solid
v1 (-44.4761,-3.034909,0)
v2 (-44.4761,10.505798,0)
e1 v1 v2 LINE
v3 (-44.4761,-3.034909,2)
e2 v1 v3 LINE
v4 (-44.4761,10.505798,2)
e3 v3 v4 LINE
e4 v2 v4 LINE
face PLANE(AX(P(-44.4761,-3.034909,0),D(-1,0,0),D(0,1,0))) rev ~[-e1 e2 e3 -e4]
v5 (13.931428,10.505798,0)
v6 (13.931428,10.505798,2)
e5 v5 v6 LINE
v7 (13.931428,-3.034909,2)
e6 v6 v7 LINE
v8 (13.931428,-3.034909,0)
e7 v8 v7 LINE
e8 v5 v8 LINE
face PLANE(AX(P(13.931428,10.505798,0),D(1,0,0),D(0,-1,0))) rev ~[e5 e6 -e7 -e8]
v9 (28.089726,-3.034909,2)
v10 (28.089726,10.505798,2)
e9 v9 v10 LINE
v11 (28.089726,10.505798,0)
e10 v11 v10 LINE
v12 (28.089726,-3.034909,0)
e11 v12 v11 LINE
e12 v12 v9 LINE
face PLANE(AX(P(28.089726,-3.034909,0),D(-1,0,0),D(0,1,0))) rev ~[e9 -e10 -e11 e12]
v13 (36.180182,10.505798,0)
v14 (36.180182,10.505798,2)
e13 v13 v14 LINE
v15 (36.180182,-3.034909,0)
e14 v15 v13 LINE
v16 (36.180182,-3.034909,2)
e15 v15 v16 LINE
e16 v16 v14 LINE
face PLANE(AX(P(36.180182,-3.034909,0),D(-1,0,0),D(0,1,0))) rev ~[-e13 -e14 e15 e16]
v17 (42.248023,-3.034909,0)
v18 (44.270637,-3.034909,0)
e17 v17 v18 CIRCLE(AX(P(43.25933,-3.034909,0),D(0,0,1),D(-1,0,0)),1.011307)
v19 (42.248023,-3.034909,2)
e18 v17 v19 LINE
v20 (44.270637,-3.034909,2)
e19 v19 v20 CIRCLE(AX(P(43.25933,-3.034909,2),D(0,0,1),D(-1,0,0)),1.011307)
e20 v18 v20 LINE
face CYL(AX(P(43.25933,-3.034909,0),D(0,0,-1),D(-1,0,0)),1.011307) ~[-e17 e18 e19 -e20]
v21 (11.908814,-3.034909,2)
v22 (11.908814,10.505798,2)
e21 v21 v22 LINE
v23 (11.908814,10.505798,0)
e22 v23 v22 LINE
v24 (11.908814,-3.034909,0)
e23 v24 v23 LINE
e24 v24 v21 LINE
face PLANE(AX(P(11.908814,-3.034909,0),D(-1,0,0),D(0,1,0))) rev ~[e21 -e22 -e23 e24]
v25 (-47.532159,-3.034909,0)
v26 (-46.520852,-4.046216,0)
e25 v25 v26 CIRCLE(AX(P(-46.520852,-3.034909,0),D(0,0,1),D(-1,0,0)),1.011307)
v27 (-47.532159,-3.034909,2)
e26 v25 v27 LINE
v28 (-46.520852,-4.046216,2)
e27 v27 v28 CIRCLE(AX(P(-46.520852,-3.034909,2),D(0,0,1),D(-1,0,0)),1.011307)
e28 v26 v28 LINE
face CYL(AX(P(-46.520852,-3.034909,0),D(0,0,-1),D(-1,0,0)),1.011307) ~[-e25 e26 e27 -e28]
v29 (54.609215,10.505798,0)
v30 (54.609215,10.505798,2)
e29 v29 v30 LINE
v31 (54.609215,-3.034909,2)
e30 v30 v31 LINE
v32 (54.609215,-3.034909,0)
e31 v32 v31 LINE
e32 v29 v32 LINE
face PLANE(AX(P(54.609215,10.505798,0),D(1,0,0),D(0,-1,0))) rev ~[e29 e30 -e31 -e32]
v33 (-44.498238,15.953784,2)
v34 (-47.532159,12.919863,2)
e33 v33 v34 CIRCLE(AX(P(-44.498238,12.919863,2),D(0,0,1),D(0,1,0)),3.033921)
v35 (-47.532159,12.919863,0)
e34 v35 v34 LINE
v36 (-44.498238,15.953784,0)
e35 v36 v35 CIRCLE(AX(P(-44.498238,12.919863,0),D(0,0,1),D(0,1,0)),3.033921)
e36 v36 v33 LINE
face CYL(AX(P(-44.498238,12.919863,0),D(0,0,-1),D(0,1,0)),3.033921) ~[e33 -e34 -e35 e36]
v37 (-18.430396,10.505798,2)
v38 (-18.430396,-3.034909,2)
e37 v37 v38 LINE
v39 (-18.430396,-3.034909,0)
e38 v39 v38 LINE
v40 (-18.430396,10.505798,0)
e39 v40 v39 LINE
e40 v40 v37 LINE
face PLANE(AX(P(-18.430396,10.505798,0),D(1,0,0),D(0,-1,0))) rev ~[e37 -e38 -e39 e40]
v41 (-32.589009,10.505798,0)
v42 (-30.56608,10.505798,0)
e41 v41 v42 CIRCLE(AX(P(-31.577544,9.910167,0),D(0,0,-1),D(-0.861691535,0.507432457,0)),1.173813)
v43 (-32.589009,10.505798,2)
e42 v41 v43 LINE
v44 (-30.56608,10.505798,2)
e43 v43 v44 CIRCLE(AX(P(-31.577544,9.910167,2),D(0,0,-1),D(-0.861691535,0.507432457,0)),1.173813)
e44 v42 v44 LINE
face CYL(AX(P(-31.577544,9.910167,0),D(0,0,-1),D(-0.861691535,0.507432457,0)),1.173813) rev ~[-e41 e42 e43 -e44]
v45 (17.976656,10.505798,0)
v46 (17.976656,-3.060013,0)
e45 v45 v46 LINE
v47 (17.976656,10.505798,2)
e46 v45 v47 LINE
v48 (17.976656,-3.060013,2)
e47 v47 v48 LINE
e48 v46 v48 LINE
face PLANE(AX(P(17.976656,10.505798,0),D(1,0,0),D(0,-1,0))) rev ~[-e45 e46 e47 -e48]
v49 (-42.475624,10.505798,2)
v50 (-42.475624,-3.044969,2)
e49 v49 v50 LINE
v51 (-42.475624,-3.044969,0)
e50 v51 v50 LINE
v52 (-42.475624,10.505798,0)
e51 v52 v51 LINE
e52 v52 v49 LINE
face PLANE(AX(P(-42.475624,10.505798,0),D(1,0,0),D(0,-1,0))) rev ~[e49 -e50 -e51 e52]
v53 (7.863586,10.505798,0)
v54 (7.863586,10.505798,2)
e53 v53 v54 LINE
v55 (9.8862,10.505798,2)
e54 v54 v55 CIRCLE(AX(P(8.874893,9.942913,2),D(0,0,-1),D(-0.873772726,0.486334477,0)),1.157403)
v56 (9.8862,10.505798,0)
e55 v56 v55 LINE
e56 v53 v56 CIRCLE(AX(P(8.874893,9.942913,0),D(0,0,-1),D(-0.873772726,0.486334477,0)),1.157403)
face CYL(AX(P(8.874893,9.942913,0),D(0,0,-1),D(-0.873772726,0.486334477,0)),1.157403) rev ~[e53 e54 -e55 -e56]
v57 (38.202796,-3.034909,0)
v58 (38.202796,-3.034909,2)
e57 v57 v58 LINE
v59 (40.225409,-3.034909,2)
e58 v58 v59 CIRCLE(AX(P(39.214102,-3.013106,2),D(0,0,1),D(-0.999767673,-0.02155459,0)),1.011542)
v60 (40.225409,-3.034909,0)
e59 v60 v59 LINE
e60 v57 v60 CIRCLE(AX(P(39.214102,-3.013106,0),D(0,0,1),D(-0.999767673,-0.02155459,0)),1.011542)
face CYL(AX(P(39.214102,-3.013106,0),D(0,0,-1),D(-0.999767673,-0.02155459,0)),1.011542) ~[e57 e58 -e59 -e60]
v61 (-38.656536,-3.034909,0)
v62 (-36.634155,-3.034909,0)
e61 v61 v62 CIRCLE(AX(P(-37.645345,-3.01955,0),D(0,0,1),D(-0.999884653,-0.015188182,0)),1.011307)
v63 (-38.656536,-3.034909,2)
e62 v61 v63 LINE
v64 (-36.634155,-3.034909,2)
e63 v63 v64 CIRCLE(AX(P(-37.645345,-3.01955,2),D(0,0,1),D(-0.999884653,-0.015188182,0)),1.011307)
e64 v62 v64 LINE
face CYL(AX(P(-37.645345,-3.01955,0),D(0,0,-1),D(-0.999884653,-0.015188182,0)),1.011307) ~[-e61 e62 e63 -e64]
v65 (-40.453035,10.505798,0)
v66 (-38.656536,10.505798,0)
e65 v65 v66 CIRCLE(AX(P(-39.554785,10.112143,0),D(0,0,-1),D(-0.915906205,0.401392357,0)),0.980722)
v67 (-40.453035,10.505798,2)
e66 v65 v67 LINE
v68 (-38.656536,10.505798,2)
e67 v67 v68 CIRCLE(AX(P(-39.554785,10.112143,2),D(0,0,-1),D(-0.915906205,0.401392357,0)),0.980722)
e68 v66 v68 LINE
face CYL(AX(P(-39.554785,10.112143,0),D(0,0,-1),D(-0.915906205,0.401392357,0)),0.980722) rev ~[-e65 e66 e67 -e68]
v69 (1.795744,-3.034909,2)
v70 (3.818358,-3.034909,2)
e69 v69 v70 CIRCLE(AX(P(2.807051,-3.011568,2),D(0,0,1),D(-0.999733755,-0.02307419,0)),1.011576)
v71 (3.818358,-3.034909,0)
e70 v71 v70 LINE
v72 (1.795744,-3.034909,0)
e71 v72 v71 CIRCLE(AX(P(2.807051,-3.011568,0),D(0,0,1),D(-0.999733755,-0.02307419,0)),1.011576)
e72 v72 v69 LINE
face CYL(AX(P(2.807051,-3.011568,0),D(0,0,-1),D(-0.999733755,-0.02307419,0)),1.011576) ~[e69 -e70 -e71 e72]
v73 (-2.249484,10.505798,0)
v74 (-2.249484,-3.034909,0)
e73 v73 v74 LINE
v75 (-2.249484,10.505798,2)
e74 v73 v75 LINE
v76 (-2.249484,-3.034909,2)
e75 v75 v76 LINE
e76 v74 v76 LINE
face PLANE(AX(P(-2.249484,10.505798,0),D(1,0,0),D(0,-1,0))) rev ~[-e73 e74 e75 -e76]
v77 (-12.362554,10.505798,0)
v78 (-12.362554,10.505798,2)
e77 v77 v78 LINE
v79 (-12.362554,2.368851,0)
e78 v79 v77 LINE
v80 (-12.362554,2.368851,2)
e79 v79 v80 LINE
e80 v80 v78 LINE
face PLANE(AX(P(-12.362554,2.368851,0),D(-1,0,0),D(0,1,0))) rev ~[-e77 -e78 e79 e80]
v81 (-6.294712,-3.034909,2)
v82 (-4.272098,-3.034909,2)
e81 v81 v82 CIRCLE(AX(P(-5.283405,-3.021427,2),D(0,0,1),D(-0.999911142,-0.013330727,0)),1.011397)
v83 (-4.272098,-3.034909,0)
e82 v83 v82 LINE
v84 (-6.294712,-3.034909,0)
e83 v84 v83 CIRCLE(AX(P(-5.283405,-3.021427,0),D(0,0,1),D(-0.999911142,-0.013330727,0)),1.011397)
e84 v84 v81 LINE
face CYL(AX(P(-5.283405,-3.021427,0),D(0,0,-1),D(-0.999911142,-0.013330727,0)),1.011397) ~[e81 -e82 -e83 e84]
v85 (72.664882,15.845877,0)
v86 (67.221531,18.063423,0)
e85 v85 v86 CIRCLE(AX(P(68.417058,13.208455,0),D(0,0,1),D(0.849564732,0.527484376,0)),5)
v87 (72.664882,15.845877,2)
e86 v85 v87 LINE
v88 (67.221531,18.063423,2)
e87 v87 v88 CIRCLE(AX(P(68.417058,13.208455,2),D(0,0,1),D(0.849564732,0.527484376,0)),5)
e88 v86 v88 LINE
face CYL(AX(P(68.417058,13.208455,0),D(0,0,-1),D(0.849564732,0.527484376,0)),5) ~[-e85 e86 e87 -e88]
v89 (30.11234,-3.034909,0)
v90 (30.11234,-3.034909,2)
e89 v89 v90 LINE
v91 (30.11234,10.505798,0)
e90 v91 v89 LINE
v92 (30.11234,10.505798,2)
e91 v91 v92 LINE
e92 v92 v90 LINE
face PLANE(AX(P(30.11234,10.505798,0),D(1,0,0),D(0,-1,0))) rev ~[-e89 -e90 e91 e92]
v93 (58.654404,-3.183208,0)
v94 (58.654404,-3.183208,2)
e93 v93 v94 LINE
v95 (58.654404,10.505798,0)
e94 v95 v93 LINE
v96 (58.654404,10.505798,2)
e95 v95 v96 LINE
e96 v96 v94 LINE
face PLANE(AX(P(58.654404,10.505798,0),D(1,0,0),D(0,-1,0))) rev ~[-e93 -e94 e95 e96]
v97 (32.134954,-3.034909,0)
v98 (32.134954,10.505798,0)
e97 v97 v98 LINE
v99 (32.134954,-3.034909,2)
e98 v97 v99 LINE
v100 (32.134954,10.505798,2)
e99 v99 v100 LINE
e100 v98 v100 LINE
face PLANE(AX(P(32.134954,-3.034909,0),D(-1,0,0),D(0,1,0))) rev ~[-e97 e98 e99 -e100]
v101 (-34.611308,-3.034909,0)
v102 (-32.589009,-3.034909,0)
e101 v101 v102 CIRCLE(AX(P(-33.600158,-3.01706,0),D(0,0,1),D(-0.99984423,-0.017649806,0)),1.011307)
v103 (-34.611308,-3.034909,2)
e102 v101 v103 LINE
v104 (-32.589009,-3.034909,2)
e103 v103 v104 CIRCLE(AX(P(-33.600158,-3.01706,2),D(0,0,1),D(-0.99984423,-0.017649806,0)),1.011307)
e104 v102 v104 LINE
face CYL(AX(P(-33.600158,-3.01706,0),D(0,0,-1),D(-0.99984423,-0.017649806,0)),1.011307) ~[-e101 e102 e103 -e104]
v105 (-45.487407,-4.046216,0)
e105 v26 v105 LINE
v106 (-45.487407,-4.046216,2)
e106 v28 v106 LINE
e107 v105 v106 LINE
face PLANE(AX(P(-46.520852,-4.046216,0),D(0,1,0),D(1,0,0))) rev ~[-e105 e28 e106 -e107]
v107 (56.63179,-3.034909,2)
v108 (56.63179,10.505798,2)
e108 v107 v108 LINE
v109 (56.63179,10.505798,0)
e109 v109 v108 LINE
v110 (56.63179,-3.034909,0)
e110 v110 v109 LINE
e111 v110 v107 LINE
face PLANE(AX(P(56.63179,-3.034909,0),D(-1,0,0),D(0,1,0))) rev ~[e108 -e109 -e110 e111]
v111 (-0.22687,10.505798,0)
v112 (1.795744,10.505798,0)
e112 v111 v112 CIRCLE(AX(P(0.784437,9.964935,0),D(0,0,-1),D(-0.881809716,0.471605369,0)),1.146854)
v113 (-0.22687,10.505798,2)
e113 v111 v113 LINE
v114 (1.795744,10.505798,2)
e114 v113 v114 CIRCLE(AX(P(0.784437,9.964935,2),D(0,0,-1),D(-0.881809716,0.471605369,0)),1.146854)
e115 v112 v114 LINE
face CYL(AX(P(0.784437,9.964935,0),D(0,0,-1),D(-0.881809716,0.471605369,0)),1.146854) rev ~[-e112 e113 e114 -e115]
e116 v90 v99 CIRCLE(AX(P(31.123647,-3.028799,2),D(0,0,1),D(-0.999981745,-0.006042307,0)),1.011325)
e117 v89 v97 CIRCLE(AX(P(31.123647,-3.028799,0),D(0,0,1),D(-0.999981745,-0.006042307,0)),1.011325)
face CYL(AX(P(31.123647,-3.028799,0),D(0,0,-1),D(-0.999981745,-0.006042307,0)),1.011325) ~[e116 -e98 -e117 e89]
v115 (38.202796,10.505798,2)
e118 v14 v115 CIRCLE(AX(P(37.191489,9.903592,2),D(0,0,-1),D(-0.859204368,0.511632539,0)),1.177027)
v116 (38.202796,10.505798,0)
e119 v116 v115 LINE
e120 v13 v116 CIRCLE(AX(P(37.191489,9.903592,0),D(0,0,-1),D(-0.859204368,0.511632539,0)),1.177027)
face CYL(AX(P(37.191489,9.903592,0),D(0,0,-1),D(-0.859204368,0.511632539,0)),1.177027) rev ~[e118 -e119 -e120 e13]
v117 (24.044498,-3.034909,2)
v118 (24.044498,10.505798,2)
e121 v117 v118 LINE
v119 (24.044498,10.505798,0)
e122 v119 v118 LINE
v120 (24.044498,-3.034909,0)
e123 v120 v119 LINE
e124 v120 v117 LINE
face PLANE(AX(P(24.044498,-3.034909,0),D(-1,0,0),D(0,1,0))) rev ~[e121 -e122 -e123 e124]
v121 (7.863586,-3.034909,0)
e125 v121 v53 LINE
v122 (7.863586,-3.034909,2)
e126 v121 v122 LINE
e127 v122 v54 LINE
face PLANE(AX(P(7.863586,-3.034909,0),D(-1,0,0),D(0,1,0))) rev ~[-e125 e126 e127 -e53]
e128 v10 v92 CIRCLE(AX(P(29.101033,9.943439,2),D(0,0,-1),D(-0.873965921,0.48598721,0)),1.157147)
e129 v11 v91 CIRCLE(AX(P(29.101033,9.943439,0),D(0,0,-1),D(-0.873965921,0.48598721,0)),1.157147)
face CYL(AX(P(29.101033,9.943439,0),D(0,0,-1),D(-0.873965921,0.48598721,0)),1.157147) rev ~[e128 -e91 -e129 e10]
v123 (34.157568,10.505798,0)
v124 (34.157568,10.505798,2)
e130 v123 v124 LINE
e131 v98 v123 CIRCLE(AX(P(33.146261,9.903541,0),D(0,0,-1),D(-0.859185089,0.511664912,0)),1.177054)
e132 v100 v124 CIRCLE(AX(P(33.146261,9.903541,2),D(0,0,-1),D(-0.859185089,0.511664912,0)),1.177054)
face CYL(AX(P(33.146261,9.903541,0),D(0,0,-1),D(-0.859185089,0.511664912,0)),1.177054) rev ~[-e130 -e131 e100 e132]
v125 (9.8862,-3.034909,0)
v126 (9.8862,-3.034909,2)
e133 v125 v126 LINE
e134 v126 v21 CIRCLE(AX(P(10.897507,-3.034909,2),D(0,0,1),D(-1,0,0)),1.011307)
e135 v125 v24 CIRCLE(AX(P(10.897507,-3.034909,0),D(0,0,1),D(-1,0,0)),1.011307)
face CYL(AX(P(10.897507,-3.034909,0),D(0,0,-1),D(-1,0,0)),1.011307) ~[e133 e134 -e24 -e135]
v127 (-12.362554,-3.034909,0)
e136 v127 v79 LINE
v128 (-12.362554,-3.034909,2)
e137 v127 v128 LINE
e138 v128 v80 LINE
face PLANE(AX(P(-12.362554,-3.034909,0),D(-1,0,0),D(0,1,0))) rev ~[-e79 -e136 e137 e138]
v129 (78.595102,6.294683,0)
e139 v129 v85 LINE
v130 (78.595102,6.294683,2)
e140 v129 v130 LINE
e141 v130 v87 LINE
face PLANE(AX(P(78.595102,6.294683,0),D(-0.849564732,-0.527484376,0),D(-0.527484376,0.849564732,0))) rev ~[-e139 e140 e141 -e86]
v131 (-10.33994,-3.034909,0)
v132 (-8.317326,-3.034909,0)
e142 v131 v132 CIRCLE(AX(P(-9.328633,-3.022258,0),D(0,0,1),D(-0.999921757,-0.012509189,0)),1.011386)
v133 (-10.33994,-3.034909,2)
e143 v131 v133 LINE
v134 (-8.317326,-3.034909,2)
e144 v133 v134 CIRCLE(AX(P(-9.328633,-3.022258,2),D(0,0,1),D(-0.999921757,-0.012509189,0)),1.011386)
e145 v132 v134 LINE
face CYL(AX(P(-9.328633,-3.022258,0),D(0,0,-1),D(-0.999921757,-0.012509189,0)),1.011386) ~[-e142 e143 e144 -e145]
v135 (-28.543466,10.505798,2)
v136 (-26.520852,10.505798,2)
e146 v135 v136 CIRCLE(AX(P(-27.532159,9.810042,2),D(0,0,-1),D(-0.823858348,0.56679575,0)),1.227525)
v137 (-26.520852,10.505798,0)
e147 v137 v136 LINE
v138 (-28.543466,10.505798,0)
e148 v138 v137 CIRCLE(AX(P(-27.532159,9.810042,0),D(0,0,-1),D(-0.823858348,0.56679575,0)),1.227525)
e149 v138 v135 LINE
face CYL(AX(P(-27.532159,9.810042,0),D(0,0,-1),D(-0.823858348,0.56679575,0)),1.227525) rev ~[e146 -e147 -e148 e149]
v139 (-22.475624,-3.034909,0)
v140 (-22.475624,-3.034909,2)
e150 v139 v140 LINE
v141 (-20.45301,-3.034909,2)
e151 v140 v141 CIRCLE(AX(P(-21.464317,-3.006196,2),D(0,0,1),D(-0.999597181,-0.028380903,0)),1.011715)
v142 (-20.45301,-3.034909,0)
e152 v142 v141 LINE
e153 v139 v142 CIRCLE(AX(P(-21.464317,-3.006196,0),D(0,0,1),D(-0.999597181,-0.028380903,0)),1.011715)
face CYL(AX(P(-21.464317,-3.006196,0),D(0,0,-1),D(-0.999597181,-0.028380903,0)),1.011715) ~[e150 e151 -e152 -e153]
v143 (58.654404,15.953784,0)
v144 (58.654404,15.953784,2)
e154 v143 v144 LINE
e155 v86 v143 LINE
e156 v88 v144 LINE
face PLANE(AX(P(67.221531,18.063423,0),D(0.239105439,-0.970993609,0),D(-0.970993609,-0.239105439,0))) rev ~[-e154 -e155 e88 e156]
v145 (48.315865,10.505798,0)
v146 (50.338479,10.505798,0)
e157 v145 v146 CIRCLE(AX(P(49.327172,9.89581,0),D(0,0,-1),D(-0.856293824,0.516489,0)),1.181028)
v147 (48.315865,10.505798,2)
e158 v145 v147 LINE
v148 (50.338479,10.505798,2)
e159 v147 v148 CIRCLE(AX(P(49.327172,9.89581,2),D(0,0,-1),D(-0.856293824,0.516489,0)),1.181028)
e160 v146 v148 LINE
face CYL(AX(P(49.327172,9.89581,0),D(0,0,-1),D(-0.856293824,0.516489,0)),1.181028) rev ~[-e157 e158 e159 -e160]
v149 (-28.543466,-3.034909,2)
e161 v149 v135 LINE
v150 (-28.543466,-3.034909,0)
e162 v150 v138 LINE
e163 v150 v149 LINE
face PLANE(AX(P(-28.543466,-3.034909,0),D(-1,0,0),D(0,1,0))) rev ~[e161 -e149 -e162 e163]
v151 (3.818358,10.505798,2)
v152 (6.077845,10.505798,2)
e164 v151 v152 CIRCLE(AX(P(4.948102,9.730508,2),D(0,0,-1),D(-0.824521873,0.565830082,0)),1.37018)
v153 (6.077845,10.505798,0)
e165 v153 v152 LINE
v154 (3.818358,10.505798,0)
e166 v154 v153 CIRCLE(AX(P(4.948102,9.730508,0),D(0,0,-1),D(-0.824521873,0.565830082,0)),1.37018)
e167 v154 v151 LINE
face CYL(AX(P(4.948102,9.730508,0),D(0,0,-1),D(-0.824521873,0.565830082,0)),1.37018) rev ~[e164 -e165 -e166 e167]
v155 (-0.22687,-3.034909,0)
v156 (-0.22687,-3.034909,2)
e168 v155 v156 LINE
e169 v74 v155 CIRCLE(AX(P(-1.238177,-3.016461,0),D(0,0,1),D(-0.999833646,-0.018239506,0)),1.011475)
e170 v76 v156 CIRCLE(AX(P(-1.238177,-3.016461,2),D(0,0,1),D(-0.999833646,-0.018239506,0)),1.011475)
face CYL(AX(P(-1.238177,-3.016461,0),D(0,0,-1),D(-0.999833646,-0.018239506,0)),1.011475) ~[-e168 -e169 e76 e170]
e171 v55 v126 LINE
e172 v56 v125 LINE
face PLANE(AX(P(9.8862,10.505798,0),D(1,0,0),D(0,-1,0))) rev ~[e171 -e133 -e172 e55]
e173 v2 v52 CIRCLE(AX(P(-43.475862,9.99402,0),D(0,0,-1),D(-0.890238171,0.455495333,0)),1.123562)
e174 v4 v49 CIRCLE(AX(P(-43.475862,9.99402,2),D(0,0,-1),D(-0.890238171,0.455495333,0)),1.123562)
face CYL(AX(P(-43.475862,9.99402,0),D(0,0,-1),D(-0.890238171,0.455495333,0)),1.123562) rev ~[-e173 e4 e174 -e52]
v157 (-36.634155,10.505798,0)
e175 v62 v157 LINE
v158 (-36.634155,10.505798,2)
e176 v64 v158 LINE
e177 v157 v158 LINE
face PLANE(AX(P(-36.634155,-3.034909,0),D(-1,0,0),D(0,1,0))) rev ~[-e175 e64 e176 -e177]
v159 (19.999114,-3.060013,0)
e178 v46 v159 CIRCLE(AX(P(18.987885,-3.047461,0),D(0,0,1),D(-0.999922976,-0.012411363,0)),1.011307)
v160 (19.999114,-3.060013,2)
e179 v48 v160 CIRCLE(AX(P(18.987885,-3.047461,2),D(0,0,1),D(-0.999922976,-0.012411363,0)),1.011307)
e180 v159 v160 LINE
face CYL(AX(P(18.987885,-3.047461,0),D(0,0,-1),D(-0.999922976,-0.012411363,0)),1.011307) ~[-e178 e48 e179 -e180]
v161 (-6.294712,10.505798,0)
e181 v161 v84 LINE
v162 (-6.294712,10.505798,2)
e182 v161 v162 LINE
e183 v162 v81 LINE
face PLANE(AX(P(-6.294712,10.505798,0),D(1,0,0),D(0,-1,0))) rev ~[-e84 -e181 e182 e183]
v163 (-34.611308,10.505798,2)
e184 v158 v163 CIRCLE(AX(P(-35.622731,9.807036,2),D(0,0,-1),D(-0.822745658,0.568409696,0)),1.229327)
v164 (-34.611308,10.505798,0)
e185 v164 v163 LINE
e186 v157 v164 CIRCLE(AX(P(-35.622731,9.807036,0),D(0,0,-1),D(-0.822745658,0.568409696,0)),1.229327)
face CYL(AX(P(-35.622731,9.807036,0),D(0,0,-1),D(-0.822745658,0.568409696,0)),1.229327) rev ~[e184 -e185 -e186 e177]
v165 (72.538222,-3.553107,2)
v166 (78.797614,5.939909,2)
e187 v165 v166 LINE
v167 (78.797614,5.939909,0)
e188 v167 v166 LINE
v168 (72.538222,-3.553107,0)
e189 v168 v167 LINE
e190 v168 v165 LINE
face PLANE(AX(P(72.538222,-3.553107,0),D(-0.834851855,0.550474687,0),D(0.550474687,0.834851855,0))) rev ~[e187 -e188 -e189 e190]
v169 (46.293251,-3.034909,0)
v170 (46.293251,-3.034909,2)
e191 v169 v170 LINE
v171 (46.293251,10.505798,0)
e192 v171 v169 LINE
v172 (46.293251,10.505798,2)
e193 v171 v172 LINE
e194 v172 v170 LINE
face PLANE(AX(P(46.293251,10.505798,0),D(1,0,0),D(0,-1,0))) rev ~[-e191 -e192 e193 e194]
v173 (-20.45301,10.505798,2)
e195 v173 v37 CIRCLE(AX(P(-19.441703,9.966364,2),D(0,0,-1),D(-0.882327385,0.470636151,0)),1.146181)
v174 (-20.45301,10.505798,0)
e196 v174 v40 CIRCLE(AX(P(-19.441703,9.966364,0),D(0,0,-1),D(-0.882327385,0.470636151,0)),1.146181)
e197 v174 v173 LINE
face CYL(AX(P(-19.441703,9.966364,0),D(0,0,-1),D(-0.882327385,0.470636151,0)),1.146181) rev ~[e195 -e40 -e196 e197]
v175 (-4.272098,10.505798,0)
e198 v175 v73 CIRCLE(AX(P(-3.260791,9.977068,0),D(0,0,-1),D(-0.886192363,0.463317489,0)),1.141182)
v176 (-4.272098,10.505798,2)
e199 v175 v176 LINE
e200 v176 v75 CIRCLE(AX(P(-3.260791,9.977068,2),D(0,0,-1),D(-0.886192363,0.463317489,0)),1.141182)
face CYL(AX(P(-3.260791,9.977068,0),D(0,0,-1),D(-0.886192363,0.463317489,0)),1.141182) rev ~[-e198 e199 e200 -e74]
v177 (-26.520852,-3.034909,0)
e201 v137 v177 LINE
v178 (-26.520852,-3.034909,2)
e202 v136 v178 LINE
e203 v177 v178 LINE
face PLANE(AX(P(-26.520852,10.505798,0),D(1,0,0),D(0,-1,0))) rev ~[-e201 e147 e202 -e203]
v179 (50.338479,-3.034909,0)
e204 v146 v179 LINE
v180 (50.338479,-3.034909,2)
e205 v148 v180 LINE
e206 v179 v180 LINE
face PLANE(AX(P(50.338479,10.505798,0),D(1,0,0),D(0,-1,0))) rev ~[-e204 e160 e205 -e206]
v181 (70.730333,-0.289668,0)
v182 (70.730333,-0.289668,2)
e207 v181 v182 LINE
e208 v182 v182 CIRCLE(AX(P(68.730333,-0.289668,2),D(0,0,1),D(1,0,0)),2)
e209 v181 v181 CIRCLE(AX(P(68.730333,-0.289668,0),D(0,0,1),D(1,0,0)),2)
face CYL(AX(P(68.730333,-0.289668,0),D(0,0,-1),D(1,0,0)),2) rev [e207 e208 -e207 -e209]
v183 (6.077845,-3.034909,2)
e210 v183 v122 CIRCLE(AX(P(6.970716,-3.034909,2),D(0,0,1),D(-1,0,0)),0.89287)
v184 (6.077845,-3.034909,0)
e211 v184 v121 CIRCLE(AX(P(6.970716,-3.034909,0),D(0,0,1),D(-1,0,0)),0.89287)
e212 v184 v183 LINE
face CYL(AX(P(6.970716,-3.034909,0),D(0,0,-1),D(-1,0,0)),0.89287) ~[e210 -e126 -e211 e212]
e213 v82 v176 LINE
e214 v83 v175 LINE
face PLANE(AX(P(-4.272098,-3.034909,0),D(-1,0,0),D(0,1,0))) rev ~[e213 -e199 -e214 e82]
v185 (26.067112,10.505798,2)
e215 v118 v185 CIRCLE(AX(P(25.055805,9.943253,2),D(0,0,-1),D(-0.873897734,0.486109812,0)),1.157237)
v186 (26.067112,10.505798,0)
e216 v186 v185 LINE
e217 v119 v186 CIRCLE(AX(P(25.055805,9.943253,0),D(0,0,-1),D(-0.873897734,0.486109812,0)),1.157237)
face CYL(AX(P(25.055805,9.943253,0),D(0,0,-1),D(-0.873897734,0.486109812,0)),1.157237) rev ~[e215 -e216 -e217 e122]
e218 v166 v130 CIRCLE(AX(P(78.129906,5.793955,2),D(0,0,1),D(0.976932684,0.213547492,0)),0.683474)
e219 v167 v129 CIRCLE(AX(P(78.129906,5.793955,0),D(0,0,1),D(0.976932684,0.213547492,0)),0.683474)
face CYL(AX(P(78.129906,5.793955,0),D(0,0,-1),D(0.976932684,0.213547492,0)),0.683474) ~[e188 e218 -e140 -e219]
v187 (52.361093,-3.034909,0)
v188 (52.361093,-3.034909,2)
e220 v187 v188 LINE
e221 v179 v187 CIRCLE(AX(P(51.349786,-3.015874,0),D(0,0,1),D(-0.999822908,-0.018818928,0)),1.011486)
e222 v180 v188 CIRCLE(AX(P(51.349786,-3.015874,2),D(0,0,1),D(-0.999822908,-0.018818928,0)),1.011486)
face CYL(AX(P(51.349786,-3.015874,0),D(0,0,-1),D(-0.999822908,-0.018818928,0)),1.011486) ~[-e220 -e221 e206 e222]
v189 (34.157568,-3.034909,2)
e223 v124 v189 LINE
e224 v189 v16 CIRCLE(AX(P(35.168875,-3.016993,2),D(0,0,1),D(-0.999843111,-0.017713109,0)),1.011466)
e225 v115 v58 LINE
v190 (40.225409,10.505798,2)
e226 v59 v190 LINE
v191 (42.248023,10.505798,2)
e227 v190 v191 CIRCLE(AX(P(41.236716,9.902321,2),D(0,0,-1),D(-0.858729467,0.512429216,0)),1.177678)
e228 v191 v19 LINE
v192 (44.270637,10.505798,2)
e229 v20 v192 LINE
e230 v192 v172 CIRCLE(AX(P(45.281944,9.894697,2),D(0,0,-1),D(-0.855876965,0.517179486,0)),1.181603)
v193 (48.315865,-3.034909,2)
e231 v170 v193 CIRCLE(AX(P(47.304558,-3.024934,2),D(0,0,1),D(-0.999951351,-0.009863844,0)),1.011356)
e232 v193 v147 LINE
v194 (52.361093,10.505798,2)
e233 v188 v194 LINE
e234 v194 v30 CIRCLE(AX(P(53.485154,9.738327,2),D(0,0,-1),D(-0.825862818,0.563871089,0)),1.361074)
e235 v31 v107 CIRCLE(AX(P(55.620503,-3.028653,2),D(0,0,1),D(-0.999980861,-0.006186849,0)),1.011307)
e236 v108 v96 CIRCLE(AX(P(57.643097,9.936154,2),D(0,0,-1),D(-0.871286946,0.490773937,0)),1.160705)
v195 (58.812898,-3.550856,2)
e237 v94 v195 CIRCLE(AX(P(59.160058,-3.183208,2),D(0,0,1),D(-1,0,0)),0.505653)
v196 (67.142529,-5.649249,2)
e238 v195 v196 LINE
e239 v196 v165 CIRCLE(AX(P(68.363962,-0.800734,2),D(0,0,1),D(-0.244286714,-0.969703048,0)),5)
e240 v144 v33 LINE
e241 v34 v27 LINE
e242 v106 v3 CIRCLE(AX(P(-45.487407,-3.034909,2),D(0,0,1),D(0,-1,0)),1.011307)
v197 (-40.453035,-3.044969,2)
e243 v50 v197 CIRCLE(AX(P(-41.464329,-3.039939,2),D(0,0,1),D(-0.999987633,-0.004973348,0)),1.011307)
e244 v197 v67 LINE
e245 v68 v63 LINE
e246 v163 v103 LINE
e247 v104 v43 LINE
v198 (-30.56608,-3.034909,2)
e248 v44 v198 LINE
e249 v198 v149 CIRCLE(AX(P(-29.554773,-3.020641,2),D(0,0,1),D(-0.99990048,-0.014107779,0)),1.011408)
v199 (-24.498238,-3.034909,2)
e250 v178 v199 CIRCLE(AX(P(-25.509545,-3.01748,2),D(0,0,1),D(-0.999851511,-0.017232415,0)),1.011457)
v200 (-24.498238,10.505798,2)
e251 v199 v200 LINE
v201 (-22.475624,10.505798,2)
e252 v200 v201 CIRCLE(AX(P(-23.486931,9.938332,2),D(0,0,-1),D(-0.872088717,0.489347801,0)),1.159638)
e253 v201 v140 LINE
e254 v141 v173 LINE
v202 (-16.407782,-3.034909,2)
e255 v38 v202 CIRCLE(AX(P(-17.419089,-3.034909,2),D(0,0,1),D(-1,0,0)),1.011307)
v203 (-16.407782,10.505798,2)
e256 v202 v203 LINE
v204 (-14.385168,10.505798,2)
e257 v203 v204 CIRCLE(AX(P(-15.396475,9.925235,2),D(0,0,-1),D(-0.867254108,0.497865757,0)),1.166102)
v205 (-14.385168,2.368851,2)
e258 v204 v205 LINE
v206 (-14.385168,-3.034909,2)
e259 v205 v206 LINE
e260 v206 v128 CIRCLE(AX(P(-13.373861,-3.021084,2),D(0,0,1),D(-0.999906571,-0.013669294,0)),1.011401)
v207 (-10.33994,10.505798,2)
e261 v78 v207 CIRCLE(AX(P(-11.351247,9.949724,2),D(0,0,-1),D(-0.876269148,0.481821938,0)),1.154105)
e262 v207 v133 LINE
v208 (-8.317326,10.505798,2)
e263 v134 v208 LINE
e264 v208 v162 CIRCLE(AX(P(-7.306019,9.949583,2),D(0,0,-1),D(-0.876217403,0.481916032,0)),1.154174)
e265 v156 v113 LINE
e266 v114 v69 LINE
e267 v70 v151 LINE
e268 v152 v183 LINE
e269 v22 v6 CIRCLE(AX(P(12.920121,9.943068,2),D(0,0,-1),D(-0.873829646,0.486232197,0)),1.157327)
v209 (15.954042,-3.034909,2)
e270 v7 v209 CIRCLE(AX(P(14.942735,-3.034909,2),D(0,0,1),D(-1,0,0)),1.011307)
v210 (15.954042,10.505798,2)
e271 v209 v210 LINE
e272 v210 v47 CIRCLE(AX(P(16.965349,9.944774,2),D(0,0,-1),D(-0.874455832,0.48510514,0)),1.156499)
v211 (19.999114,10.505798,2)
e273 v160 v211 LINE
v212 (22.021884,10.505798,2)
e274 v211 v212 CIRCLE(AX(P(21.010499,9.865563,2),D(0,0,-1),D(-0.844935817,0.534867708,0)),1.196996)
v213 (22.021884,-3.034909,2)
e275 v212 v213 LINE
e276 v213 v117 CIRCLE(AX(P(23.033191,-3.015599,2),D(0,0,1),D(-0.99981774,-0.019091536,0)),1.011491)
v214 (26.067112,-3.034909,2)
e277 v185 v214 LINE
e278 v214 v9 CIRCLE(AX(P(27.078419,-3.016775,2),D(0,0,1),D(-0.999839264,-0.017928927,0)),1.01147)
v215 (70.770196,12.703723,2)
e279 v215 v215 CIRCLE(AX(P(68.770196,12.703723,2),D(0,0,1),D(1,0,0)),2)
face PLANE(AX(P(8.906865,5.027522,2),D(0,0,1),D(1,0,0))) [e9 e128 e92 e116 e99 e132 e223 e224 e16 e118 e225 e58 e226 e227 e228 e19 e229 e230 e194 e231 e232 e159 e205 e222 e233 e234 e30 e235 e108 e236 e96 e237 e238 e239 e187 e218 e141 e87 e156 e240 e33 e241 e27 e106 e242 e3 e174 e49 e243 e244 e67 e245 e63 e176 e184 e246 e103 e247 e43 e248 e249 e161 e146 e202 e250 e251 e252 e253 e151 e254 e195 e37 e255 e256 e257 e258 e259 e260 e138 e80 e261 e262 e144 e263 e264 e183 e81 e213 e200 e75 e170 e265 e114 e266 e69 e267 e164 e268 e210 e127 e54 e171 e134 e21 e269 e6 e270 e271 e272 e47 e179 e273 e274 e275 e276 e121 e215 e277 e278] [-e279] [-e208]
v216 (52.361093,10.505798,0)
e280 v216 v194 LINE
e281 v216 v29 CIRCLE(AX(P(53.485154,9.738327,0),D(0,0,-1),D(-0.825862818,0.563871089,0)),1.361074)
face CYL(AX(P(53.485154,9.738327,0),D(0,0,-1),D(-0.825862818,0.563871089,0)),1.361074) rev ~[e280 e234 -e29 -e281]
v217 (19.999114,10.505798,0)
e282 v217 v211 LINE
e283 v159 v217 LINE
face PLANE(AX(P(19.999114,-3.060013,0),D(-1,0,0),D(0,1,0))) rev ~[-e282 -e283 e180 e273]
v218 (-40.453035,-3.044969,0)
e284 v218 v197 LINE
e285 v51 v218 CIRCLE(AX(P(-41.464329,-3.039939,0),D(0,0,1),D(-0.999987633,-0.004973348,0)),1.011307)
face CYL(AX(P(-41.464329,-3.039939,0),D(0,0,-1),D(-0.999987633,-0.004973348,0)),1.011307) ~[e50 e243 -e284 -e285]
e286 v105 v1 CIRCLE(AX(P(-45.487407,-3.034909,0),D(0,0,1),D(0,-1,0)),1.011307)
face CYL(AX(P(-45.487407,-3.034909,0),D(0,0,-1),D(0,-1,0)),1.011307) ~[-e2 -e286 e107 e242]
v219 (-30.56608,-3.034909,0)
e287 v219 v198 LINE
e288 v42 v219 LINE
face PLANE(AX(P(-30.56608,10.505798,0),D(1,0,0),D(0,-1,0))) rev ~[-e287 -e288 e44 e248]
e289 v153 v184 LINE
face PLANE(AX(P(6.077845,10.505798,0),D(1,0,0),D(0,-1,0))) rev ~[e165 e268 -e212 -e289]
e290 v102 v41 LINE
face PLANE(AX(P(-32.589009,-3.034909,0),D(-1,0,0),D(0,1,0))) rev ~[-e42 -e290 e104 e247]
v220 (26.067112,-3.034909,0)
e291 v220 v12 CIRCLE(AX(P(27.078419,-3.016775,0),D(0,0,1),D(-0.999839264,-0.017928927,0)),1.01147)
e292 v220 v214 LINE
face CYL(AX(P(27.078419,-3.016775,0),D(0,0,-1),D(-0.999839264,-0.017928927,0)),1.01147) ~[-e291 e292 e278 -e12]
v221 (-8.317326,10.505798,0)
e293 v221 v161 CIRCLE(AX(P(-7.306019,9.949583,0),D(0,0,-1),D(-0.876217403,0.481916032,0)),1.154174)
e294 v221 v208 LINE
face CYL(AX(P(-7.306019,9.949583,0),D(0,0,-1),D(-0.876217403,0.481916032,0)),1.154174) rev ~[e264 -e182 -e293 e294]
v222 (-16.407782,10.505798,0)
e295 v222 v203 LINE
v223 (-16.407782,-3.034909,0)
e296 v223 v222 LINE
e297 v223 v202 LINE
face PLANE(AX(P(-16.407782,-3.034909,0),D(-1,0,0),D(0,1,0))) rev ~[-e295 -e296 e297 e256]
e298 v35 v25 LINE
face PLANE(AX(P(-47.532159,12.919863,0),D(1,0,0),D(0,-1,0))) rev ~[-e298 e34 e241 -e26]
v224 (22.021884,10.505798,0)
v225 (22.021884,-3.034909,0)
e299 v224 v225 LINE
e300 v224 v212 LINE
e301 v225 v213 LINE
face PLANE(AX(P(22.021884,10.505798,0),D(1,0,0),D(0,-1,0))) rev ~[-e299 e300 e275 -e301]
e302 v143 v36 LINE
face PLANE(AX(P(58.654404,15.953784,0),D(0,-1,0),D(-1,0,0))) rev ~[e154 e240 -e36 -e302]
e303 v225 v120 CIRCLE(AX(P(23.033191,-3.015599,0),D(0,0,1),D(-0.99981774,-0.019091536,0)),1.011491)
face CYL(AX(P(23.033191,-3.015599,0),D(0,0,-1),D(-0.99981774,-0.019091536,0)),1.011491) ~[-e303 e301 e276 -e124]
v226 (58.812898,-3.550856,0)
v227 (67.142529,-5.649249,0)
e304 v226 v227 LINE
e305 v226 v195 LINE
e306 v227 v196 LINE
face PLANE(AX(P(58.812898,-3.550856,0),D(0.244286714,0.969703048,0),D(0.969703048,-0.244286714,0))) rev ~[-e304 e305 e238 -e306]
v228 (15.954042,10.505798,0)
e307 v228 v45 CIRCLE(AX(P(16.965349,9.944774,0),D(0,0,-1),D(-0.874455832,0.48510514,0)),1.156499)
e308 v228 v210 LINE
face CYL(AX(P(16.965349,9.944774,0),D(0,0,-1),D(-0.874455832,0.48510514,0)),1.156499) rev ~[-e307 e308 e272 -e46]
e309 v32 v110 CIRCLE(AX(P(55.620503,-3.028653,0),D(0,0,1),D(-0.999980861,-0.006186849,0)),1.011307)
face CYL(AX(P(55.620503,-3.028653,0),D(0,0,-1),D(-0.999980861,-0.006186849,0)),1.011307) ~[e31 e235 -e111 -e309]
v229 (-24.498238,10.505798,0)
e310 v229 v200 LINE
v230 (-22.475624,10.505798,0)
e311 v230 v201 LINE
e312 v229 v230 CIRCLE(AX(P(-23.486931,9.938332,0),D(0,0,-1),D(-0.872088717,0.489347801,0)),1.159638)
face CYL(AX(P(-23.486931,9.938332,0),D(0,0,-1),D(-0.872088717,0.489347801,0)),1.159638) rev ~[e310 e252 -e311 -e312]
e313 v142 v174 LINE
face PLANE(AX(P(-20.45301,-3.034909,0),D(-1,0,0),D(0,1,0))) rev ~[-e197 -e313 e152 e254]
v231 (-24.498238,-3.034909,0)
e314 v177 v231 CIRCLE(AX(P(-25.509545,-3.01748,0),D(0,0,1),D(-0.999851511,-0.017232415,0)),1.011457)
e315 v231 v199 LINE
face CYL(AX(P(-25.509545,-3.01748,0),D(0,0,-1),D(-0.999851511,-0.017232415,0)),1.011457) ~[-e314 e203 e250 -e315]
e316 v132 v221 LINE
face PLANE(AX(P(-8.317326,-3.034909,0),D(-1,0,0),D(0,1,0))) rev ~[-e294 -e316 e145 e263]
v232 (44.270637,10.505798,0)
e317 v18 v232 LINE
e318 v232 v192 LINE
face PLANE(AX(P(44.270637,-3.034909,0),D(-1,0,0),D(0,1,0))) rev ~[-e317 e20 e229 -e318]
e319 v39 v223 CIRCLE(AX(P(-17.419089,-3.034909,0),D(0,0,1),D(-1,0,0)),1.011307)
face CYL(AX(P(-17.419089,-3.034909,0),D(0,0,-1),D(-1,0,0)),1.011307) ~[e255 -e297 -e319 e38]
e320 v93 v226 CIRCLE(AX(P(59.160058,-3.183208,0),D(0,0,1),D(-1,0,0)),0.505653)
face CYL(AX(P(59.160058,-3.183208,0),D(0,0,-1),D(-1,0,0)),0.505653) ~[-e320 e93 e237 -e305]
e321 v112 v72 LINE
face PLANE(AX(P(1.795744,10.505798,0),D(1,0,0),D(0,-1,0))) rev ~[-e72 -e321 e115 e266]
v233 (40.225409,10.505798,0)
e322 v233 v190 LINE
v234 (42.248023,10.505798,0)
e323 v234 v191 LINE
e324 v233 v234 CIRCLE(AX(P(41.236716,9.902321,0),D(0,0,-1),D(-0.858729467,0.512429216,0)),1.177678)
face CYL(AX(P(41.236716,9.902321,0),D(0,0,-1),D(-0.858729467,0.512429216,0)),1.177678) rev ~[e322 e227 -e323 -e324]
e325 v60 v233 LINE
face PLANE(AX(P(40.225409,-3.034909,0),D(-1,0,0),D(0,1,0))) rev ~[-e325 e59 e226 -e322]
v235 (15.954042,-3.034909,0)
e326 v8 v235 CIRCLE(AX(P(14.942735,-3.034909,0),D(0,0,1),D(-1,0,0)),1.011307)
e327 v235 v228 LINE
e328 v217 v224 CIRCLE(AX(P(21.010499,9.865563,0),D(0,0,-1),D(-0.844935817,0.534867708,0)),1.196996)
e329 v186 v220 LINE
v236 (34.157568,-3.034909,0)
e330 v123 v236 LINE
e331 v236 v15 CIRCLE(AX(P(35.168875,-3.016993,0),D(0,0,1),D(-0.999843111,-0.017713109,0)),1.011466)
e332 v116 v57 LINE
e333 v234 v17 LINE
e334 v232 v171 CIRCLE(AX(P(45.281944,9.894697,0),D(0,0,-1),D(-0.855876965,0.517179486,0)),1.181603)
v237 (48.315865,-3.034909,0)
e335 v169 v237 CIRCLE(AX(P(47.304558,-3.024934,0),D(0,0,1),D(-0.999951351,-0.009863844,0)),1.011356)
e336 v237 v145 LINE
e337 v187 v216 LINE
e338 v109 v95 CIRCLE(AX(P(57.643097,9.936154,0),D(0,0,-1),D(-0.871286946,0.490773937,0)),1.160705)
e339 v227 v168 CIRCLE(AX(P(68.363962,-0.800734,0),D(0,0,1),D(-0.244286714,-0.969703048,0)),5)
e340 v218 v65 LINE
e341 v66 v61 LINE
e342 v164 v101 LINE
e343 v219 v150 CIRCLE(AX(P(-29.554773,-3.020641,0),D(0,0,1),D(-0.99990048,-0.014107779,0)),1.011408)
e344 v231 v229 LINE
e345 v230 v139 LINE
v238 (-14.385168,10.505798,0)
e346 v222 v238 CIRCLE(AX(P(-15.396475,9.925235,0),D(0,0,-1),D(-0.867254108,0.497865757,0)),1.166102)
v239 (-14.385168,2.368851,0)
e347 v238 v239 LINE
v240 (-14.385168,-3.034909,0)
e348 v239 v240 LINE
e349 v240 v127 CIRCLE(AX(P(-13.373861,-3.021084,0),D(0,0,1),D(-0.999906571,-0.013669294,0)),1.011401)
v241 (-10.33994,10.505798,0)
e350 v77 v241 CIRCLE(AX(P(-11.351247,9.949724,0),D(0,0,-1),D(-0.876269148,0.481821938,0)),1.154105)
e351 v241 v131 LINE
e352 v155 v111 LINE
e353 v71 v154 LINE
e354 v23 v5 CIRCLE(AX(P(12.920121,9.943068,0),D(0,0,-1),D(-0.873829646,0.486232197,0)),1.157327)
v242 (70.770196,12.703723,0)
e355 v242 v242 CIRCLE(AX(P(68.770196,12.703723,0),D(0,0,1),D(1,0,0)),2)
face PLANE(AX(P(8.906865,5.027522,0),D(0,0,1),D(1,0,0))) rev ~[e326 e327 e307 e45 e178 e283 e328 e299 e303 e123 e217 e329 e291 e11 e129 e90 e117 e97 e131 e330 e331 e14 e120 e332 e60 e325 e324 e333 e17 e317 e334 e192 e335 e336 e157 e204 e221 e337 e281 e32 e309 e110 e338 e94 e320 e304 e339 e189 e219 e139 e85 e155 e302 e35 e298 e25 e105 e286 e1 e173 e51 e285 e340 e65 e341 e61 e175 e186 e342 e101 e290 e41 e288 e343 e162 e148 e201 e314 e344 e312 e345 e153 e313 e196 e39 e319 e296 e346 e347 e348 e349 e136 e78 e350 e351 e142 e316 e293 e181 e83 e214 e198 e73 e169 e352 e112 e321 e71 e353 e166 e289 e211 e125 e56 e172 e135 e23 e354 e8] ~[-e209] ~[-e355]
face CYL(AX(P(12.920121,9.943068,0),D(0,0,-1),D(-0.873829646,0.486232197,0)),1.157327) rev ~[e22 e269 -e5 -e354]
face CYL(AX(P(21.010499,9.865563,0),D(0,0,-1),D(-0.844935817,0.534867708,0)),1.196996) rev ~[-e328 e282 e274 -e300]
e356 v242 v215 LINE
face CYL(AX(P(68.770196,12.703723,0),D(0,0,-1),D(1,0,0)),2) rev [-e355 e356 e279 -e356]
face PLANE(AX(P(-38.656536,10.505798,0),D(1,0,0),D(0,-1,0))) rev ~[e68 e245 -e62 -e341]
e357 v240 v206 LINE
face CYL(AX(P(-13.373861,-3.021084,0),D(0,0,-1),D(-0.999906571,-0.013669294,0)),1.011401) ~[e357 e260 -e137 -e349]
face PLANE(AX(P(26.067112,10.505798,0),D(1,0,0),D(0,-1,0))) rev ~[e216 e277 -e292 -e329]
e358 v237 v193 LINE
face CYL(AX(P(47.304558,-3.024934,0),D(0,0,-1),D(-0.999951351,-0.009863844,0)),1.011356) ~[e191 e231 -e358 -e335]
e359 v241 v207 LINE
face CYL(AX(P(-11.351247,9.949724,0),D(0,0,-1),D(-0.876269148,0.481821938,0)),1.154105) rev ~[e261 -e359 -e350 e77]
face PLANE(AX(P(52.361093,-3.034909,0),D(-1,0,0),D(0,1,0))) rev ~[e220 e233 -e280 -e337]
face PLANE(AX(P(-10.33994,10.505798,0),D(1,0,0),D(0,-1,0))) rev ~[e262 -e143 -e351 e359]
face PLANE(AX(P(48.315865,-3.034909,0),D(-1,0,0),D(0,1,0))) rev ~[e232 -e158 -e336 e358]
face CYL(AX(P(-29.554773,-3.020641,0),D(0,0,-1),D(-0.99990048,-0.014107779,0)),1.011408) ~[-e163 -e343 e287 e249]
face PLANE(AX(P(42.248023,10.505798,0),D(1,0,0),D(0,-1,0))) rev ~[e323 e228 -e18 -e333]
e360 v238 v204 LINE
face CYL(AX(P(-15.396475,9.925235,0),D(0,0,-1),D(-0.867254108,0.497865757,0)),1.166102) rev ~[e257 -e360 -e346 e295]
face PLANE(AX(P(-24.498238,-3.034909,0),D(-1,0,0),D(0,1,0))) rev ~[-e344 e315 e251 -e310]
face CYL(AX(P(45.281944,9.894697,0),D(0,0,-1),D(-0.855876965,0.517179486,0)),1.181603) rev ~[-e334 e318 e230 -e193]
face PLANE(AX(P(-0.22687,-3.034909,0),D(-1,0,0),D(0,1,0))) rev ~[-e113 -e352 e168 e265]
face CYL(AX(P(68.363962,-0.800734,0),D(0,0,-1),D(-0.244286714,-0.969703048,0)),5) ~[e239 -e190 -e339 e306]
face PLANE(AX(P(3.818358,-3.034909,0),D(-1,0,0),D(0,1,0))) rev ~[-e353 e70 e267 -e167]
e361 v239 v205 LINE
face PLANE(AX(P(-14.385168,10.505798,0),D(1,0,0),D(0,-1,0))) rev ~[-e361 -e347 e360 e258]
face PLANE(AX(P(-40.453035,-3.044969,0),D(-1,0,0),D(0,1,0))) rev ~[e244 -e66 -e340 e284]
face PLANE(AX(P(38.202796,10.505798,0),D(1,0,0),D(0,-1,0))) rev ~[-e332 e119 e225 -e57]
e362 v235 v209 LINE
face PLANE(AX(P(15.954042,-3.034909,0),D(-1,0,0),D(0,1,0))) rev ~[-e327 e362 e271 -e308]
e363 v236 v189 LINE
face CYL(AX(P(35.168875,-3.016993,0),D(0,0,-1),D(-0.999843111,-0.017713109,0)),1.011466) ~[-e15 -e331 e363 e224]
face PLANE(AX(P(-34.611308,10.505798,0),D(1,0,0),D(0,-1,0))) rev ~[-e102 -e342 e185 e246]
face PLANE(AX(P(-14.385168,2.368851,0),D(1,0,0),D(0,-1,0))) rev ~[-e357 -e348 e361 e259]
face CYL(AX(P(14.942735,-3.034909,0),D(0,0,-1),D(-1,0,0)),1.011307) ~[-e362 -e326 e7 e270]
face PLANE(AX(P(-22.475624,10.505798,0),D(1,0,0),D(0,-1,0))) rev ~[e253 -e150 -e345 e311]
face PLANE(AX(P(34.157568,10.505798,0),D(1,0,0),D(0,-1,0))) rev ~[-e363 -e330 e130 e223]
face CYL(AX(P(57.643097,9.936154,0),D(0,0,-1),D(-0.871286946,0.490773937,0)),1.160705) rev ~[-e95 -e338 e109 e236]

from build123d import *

# Parameters (mm, degrees)
F0_R     = 2
F1_DEPTH = 2


# Not quite as in the source:
# - a feature names something its author has since deleted; it is built from what else it names


with BuildPart() as f1:
    # F0 (on Top) → F1 (new body)
    with BuildSketch(Plane.XY):
        with BuildLine():
            ThreePointArc((-47.5321587284, -3.0349094544), (-47.2359537694, -3.7500114836), (-46.5208517402, -4.0462164426))
            Line((-46.5208517402, -4.0462164426), (-45.4874065769, -4.0462164426))
            ThreePointArc((-45.4874065769, -4.0462164426), (-44.7723045476, -3.7500114836), (-44.4760995886, -3.0349094544))
            Line((-44.4760995886, -3.0349094544), (-44.4760995886, 10.5057977874))
            ThreePointArc((-44.4760995886, 10.5057977874), (-43.4758616879, 11.1175826134), (-42.4756237872, 10.5057977874))
            Line((-42.4756237872, 10.5057977874), (-42.4756237872, -3.0349094544))
            Line((-42.4756237872, -3.0349094544), (-42.4756237872, -3.0449686175))
            ThreePointArc((-42.4756237872, -3.0449686175), (-41.464329306, -4.0512460242), (-40.4530348247, -3.0449686175))
            Line((-40.4530348247, -3.0449686175), (-40.4530348247, -3.0349094544))
            Line((-40.4530348247, -3.0349094544), (-40.4530348247, 2.3688513962))
            Line((-40.4530348247, 2.3688513962), (-40.4530348247, 10.5057977874))
            ThreePointArc((-40.4530348247, 10.5057977874), (-39.5547852119, 11.0928656343), (-38.6565355991, 10.5057977874))
            Line((-38.6565355991, 10.5057977874), (-38.6565355991, 2.3688513962))
            Line((-38.6565355991, 2.3688513962), (-38.6565355991, -3.0349094544))
            ThreePointArc((-38.6565355991, -3.0349094544), (-37.6453452622, -4.0308565278), (-36.6341549253, -3.0349094544))
            Line((-36.6341549253, -3.0349094544), (-36.6341549253, 2.3688513962))
            Line((-36.6341549253, 2.3688513962), (-36.6341549253, 10.5057977874))
            ThreePointArc((-36.6341549253, 10.5057977874), (-35.6227312857, 11.0363635), (-34.6113076461, 10.5057977874))
            Line((-34.6113076461, 10.5057977874), (-34.6113076461, 2.3688513962))
            Line((-34.6113076461, 2.3688513962), (-34.6113076461, -3.0349094544))
            ThreePointArc((-34.6113076461, -3.0349094544), (-33.6001581891, -4.0283670709), (-32.5890087321, -3.0349094544))
            Line((-32.5890087321, -3.0349094544), (-32.5890087321, 2.3688513962))
            Line((-32.5890087321, 2.3688513962), (-32.5890087321, 10.5057977874))
            ThreePointArc((-32.5890087321, 10.5057977874), (-31.5775442126, 11.0839798549), (-30.5660796932, 10.5057977874))
            Line((-30.5660796932, 10.5057977874), (-30.5660796932, 2.3688513962))
            Line((-30.5660796932, 2.3688513962), (-30.5660796932, -3.0349094544))
            ThreePointArc((-30.5660796932, -3.0349094544), (-29.5547727049, -4.0320483822), (-28.5434657167, -3.0349094544))
            Line((-28.5434657167, -3.0349094544), (-28.5434657167, 2.3688513962))
            Line((-28.5434657167, 2.3688513962), (-28.5434657167, 10.5057977874))
            ThreePointArc((-28.5434657167, 10.5057977874), (-27.5321587284, 11.0375669764), (-26.5208517402, 10.5057977874))
            Line((-26.5208517402, 10.5057977874), (-26.5208517402, 2.3688513962))
            Line((-26.5208517402, 2.3688513962), (-26.5208517402, -3.0349094544))
            ThreePointArc((-26.5208517402, -3.0349094544), (-25.5095447519, -4.0289367833), (-24.4982377637, -3.0349094544))
            Line((-24.4982377637, -3.0349094544), (-24.4982377637, 2.3688513962))
            Line((-24.4982377637, 2.3688513962), (-24.4982377637, 10.5057977874))
            ThreePointArc((-24.4982377637, 10.5057977874), (-23.4869307754, 11.0979693494), (-22.4756237872, 10.5057977874))
            Line((-22.4756237872, 10.5057977874), (-22.4756237872, 2.3688513962))
            Line((-22.4756237872, 2.3688513962), (-22.4756237872, -3.0349094544))
            ThreePointArc((-22.4756237872, -3.0349094544), (-21.464316799, -4.0179106089), (-20.4530098107, -3.0349094544))
            Line((-20.4530098107, -3.0349094544), (-20.4530098107, 2.3688513962))
            Line((-20.4530098107, 2.3688513962), (-20.4530098107, 10.5057977874))
            ThreePointArc((-20.4530098107, 10.5057977874), (-19.4417028225, 11.112544636), (-18.4303958342, 10.5057977874))
            Line((-18.4303958342, 10.5057977874), (-18.4303958342, 2.3688513962))
            Line((-18.4303958342, 2.3688513962), (-18.4303958342, -3.0349094544))
            ThreePointArc((-18.4303958342, -3.0349094544), (-17.419088846, -4.0462164426), (-16.4077818577, -3.0349094544))
            Line((-16.4077818577, -3.0349094544), (-16.4077818577, 2.3688513962))
            Line((-16.4077818577, 2.3688513962), (-16.4077818577, 10.5057977874))
            ThreePointArc((-16.4077818577, 10.5057977874), (-15.3964748695, 11.0913376707), (-14.3851678813, 10.5057977874))
            Line((-14.3851678813, 10.5057977874), (-14.3851678812, 2.3688513962))
            Line((-14.3851678812, 2.3688513962), (-14.3851678812, -3.0349094544))
            ThreePointArc((-14.3851678812, -3.0349094544), (-13.373860893, -4.0324857923), (-12.3625539048, -3.0349094544))
            Line((-12.3625539048, -3.0349094544), (-12.3625539048, 2.3688513962))
            Line((-12.3625539047, 2.3688513962), (-12.3625539048, 10.5057977874))
            ThreePointArc((-12.3625539048, 10.5057977874), (-11.3512469165, 11.1038299062), (-10.3399399283, 10.5057977874))
            Line((-10.3399399283, 10.5057977874), (-10.3399399283, 2.3688513962))
            Line((-10.3399399283, 2.3688513962), (-10.3399399283, -3.0349094544))
            ThreePointArc((-10.3399399283, -3.0349094544), (-9.32863294, -4.0336439564), (-8.3173259518, -3.0349094544))
            Line((-8.3173259518, -3.0349094544), (-8.3173259518, 2.3688513962))
            Line((-8.3173259518, 2.3688513962), (-8.3173259518, 10.5057977874))
            ThreePointArc((-8.3173259518, 10.5057977874), (-7.3060189635, 11.1037566218), (-6.2947119753, 10.5057977874))
            Line((-6.2947119753, 10.5057977874), (-6.2947119753, 2.3688513962))
            Line((-6.2947119753, 2.3688513962), (-6.2947119753, -3.0349094544))
            ThreePointArc((-6.2947119753, -3.0349094544), (-5.283404987, -4.0328236585), (-4.2720979988, -3.0349094544))
            Line((-4.2720979988, -3.0349094544), (-4.2720979988, 2.3688513962))
            Line((-4.2720979988, 2.3688513962), (-4.2720979988, 10.5057977874))
            ThreePointArc((-4.2720979988, 10.5057977874), (-3.2607910105, 11.1182503387), (-2.2494840223, 10.5057977874))
            Line((-2.2494840223, 10.5057977874), (-2.2494840223, 2.3688513962))
            Line((-2.2494840223, 2.3688513962), (-2.2494840223, -3.0349094544))
            ThreePointArc((-2.2494840223, -3.0349094544), (-1.2381770341, -4.0279358965), (-0.2268700458, -3.0349094544))
            Line((-0.2268700458, -3.0349094544), (-0.2268700458, 2.3688513962))
            Line((-0.2268700458, 2.3688513962), (-0.2268700458, 10.5057977874))
            ThreePointArc((-0.2268700458, 10.5057977874), (0.7844369424, 11.1117892762), (1.7957439307, 10.5057977874))
            Line((1.7957439307, 10.5057977874), (1.7957439307, 2.3688513962))
            Line((1.7957439307, 2.3688513962), (1.7957439307, -3.0349094544))
            ThreePointArc((1.7957439307, -3.0349094544), (2.8070509189, -4.0231444656), (3.8183579072, -3.0349094544))
            Line((3.8183579072, -3.0349094544), (3.8183579072, 2.3688513962))
            Line((3.8183579072, 2.3688513962), (3.8183579072, 10.5057977874))
            ThreePointArc((3.8183579072, 10.5057977874), (4.9481016159, 11.1006888991), (6.0778453246, 10.5057977874))
            Line((6.0778453246, 10.5057977874), (6.0778453246, 2.3688513962))
            Line((6.0778453246, 2.3688513962), (6.0778453246, -3.0349094544))
            ThreePointArc((6.0778453246, -3.0349094544), (6.9707155924, -3.9277797221), (7.8635858601, -3.0349094544))
            Line((7.8635858601, -3.0349094544), (7.8635858601, 2.3688513962))
            Line((7.8635858601, 2.3688513962), (7.8635858601, 10.5057977874))
            ThreePointArc((7.8635858601, 10.5057977874), (8.8748928484, 11.1003156957), (9.8861998366, 10.5057977874))
            Line((9.8861998366, 10.5057977874), (9.8861998366, 2.3688513962))
            Line((9.8861998366, 2.3688513962), (9.8861998366, -3.0349094544))
            ThreePointArc((9.8861998366, -3.0349094544), (10.8975068249, -4.0462164426), (11.9088138131, -3.0349094544))
            Line((11.9088138131, -3.0349094544), (11.9088138131, 2.3688513962))
            Line((11.9088138131, 2.3688513962), (11.9088138131, 10.5057977874))
            ThreePointArc((11.9088138131, 10.5057977874), (12.9201208014, 11.1003953408), (13.9314277896, 10.5057977874))
            Line((13.9314277896, 10.5057977874), (13.9314277896, 2.3688513962))
            Line((13.9314277896, 2.3688513962), (13.9314277896, -3.0349094544))
            ThreePointArc((13.9314277896, -3.0349094544), (14.9427347779, -4.0462164426), (15.9540417661, -3.0349094544))
            Line((15.9540417661, -3.0349094544), (15.9540417661, 2.3688513962))
            Line((15.9540417661, 2.3688513962), (15.9540417661, 10.5057977874))
            ThreePointArc((15.9540417661, 10.5057977874), (16.9653487543, 11.1012729968), (17.9766557426, 10.5057977874))
            Line((17.9766557426, 10.5057977874), (17.9766557426, -3.0349094544))
            Line((17.9766557426, -3.0349094544), (17.9766557426, -3.0600128507))
            ThreePointArc((17.9766557426, -3.0600128507), (18.987884836, -4.0587681408), (19.9991139294, -3.0600128507))
            Line((19.9991139294, -3.0600128507), (19.9991139294, -3.0349094544))
            Line((19.9991139294, -3.0349094544), (19.9991139294, 2.3688513962))
            Line((19.9991139294, 2.3688513962), (19.9991139294, 10.5057977874))
            ThreePointArc((19.9991139294, 10.5057977874), (21.0104988125, 11.0625593301), (22.0218836956, 10.5057977874))
            Line((22.0218836956, 10.5057977874), (22.0218836956, 2.3688513962))
            Line((22.0218836956, 2.3688513962), (22.0218836956, -3.0349094544))
            ThreePointArc((22.0218836956, -3.0349094544), (23.0331906838, -4.0270898738), (24.0444976721, -3.0349094544))
            Line((24.0444976721, -3.0349094544), (24.0444976721, 2.3688513962))
            Line((24.0444976721, 2.3688513962), (24.0444976721, 10.5057977874))
            ThreePointArc((24.0444976721, 10.5057977874), (25.0558046603, 11.1004906415), (26.0671116486, 10.5057977874))
            Line((26.0671116486, 10.5057977874), (26.0671116486, 2.3688513962))
            Line((26.0671116486, 2.3688513962), (26.0671116486, -3.0349094544))
            ThreePointArc((26.0671116486, -3.0349094544), (27.0784186368, -4.0282444578), (28.089725625, -3.0349094544))
            Line((28.089725625, -3.0349094544), (28.089725625, 2.3688513962))
            Line((28.089725625, 2.3688513962), (28.089725625, 10.5057977874))
            ThreePointArc((28.089725625, 10.5057977874), (29.1010326133, 11.1005861122), (30.1123396015, 10.5057977874))
            Line((30.1123396015, 10.5057977874), (30.1123396015, 2.3688513962))
            Line((30.1123396015, 2.3688513962), (30.1123396015, -3.0349094544))
            ThreePointArc((30.1123396015, -3.0349094544), (31.1236465898, -4.0401241658), (32.134953578, -3.0349094544))
            Line((32.134953578, -3.0349094544), (32.134953578, 2.3688513962))
            Line((32.134953578, 2.3688513962), (32.134953578, 10.5057977874))
            ThreePointArc((32.134953578, 10.5057977874), (33.1462605663, 11.0805944093), (34.1575675545, 10.5057977874))
            Line((34.1575675545, 10.5057977874), (34.1575675545, 2.3688513962))
            Line((34.1575675545, 2.3688513962), (34.1575675545, -3.0349094544))
            ThreePointArc((34.1575675545, -3.0349094544), (35.1688745428, -4.0284589293), (36.180181531, -3.0349094544))
            Line((36.180181531, -3.0349094544), (36.180181531, 2.3688513962))
            Line((36.180181531, 2.3688513962), (36.180181531, 10.5057977874))
            ThreePointArc((36.180181531, 10.5057977874), (37.1914885192, 11.0806196167), (38.2027955075, 10.5057977874))
            Line((38.2027955075, 10.5057977874), (38.2027955075, 2.3688513962))
            Line((38.2027955075, 2.3688513962), (38.2027955075, -3.0349094544))
            ThreePointArc((38.2027955075, -3.0349094544), (39.2141024957, -4.0246480782), (40.225409484, -3.0349094544))
            Line((40.225409484, -3.0349094544), (40.225409484, 2.3688513962))
            Line((40.225409484, 2.3688513962), (40.225409484, 10.5057977874))
            ThreePointArc((40.225409484, 10.5057977874), (41.2367164722, 11.0799992786), (42.2480234605, 10.5057977874))
            Line((42.2480234605, 10.5057977874), (42.2480234605, 2.3688513962))
            Line((42.2480234605, 2.3688513962), (42.2480234605, -3.0349094544))
            ThreePointArc((42.2480234605, -3.0349094544), (43.2593304487, -4.0462164426), (44.270637437, -3.0349094544))
            Line((44.270637437, -3.0349094544), (44.270637437, 2.3688513962))
            Line((44.270637437, 2.3688513962), (44.270637437, 10.5057977874))
            ThreePointArc((44.270637437, 10.5057977874), (45.2819444252, 11.0763000676), (46.2932514135, 10.5057977874))
            Line((46.2932514135, 10.5057977874), (46.2932514135, 2.3688513962))
            Line((46.2932514135, 2.3688513962), (46.2932514135, -3.0349094544))
            ThreePointArc((46.2932514135, -3.0349094544), (47.3045584017, -4.0362897846), (48.3158653899, -3.0349094544))
            Line((48.3158653899, -3.0349094544), (48.3158653899, 2.3688513962))
            Line((48.3158653899, 2.3688513962), (48.3158653899, 10.5057977874))
            ThreePointArc((48.3158653899, 10.5057977874), (49.3271723782, 11.0768378201), (50.3384793664, 10.5057977874))
            Line((50.3384793664, 10.5057977874), (50.3384793664, 2.3688513962))
            Line((50.3384793664, 2.3688513962), (50.3384793664, -3.0349094544))
            ThreePointArc((50.3384793664, -3.0349094544), (51.3497863547, -4.0273604844), (52.3610933429, -3.0349094544))
            Line((52.3610933429, -3.0349094544), (52.3610933429, 2.3688513962))
            Line((52.3610933429, 2.3688513962), (52.3610933429, 10.5057977874))
            ThreePointArc((52.3610933429, 10.5057977874), (53.4851541573, 11.0994017223), (54.6092149717, 10.5057977874))
            Line((54.6092149717, 10.5057977874), (54.6092149717, 2.3688513962))
            Line((54.6092149717, 2.3688513962), (54.6092149717, -3.0349094544))
            ThreePointArc((54.6092149717, -3.0349094544), (55.6205026048, -4.039959639), (56.6317902379, -3.0349094544))
            Line((56.6317902379, -3.0349094544), (56.6317902379, 10.5057977874))
            ThreePointArc((56.6317902379, 10.5057977874), (57.6430972262, 11.0968589506), (58.6544042144, 10.5057977874))
            Line((58.6544042144, 10.5057977874), (58.6544042144, -3.183207694))
            ThreePointArc((58.6544042144, -3.183207694), (58.6957151001, -3.3833861096), (58.8128977225, -3.5508561677))
            Line((58.8128977225, -3.5508561677), (67.1425286707, -5.6492492557))
            ThreePointArc((67.1425286707, -5.6492492557), (70.1745553832, -5.4613941054), (72.5382215144, -3.553107449))
            Line((72.5382215144, -3.553107449), (78.7976136626, 5.9399087982))
            ThreePointArc((78.7976136626, 5.9399087982), (78.7234830832, 6.1327797263), (78.5951017421, 6.2946833056))
            Line((78.5951017421, 6.2946833056), (72.6648820615, 15.8458770867))
            ThreePointArc((72.6648820615, 15.8458770867), (70.3034587252, 17.8389512741), (67.2215312081, 18.0634232527))
            Line((67.2215312081, 18.0634232527), (58.6544042144, 15.9537835574))
            Line((58.6544042144, 15.9537835574), (-44.4982377637, 15.9537835574))
            ThreePointArc((-44.4982377637, 15.9537835574), (-46.6435438514, 15.0651686804), (-47.5321587284, 12.9198625927))
            Line((-47.5321587284, 12.9198625927), (-47.5321587284, -3.0349094544))
        make_face()
        with Locations((68.7303330245, -0.2896678891)):
            Circle(F0_R, mode=Mode.SUBTRACT)
        with Locations((68.7701961271, 12.7037232041)):
            Circle(F0_R, mode=Mode.SUBTRACT)
    extrude(amount=F1_DEPTH)


solid = f1.part
